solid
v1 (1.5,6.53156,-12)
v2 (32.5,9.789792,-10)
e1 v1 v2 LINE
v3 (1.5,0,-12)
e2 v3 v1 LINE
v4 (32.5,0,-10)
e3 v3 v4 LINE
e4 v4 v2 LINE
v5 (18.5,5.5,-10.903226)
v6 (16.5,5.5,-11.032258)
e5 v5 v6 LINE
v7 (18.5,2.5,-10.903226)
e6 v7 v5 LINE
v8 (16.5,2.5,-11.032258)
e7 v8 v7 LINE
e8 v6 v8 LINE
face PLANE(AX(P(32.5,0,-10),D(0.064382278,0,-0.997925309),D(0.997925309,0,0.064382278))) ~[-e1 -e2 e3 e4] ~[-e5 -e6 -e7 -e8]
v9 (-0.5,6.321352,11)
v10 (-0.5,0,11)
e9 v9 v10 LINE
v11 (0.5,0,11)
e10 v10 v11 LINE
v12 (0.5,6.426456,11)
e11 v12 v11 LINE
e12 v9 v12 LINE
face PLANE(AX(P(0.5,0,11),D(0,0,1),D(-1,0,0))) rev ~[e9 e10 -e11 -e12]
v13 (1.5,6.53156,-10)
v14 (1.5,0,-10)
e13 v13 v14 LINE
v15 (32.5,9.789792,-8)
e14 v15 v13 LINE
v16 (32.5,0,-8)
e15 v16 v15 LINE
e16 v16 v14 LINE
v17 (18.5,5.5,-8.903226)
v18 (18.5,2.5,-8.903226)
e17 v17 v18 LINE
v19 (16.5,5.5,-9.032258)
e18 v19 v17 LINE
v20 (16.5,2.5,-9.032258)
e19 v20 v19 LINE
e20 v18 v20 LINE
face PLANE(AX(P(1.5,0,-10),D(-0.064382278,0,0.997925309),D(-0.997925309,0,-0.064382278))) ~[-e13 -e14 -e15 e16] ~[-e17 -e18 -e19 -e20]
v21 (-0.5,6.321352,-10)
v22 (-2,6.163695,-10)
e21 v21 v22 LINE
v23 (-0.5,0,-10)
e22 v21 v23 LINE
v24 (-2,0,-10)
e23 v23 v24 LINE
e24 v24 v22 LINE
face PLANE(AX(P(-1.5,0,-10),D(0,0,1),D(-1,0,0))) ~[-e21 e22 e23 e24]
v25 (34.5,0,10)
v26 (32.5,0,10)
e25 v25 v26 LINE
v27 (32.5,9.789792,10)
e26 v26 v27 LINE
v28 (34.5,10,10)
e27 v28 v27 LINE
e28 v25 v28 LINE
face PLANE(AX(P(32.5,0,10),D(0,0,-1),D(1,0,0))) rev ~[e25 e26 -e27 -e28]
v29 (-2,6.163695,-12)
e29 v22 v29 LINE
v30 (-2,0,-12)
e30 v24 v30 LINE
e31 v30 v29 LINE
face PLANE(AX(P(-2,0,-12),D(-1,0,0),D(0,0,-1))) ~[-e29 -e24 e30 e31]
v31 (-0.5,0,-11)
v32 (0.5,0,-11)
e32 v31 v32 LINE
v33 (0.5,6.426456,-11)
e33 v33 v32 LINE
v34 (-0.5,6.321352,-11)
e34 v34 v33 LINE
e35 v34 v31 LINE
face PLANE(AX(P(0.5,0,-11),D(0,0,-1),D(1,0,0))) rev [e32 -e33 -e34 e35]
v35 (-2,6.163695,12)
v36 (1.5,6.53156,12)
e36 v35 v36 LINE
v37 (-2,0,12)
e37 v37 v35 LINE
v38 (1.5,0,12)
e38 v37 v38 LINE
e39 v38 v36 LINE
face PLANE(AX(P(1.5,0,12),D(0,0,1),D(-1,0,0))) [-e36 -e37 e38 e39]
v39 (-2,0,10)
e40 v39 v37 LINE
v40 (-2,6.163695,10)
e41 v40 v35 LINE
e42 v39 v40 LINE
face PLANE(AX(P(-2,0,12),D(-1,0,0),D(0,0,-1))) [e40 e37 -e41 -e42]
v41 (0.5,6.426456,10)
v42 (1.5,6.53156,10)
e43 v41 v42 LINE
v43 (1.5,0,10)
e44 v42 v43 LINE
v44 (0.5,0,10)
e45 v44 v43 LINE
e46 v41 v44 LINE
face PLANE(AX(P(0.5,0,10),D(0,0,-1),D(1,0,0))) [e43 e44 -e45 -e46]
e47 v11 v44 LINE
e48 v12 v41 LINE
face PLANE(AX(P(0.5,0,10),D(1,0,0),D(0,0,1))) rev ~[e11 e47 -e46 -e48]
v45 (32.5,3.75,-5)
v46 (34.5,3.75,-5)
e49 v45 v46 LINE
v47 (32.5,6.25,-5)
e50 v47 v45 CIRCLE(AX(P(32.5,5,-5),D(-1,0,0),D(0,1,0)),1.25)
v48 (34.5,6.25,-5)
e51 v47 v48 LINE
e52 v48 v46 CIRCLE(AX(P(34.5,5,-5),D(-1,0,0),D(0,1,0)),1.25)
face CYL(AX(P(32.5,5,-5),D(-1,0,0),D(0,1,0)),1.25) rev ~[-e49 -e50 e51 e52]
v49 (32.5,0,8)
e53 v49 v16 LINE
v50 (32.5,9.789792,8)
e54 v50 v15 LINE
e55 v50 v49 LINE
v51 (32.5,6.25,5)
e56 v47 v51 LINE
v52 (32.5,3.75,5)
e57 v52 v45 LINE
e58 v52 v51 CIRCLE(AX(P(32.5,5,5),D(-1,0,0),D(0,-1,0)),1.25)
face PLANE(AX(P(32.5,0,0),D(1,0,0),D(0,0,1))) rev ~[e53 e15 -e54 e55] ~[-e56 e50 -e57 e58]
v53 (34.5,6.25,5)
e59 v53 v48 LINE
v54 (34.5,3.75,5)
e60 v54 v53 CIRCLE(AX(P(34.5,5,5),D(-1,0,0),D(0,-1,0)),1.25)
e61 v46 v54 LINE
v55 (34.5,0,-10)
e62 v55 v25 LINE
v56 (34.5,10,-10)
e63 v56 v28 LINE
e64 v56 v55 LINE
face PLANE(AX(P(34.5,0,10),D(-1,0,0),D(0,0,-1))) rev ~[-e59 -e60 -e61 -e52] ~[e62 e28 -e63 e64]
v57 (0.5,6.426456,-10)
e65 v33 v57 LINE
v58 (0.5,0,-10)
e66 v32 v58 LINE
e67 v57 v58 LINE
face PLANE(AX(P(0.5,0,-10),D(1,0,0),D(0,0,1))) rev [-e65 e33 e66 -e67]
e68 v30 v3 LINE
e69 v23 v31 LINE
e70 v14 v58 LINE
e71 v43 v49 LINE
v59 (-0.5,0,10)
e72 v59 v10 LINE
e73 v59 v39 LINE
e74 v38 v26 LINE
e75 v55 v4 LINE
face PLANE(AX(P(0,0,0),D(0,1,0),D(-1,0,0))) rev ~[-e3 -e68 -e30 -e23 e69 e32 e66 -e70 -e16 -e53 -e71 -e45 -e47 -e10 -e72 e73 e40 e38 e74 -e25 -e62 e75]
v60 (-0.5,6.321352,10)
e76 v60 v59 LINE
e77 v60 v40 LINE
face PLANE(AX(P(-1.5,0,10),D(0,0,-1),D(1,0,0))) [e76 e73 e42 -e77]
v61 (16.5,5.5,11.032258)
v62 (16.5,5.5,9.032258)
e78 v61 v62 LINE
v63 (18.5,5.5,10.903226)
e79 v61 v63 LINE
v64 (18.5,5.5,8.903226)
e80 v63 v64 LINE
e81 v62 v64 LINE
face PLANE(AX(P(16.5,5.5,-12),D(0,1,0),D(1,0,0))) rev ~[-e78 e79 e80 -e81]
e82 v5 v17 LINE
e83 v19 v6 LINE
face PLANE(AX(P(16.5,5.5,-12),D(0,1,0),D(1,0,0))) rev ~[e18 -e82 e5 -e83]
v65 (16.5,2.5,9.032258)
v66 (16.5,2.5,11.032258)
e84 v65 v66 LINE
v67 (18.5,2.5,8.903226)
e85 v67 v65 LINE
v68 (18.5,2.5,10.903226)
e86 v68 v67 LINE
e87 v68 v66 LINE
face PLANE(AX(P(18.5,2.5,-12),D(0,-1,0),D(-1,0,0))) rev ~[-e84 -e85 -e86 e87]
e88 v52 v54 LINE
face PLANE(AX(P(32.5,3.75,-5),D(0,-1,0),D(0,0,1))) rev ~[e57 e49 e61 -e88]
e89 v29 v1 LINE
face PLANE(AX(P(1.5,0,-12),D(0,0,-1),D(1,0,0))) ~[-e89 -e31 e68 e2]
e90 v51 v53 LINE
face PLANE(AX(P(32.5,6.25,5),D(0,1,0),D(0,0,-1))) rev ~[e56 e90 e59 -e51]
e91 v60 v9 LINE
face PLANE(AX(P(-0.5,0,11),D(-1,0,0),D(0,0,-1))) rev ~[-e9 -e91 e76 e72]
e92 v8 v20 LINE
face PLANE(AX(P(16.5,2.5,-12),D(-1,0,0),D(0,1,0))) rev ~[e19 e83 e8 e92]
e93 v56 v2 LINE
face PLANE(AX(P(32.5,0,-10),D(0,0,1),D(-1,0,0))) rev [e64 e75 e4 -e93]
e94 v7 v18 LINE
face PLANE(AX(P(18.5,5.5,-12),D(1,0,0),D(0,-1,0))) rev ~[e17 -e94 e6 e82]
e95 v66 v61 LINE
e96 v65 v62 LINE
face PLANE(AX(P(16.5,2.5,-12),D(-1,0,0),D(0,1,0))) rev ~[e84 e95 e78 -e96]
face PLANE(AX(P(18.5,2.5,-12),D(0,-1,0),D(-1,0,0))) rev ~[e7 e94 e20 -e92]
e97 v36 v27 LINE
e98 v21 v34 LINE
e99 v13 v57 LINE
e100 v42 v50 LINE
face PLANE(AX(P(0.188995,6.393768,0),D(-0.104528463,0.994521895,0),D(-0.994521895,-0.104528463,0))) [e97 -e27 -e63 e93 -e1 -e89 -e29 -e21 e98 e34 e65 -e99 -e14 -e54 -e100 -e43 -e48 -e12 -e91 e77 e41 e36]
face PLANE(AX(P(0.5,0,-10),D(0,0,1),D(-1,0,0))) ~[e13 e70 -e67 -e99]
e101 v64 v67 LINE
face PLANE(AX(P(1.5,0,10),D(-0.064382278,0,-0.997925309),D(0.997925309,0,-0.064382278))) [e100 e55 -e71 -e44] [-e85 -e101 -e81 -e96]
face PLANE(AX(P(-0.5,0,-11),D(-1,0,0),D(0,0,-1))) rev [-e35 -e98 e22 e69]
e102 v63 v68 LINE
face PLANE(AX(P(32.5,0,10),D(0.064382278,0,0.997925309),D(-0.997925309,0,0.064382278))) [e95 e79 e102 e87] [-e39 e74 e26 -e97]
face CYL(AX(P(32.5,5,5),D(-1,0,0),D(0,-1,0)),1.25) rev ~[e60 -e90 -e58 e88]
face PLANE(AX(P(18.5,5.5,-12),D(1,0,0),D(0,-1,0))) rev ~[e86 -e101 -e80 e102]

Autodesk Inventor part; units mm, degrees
ref_plane "YZ Plane" through (0, 0, 0) normal (1, 0, 0) x (0, 1, 0)
ref_plane "XZ Plane" through (0, 0, 0) normal (0, 1, 0) x (-1, 0, 0)
ref_plane "XY Plane" through (0, 0, 0) normal (0, 0, 1) x (1, 0, 0)
sketch "Sketch1" plane through (0, 0, 0) normal (0, 1, 0) x (-1, 0, 0)
  line L0 (-0.5, 11) -> (0.5, 11) construction
  line L1 (0.5, 11) -> (0.5, -11) construction
  line L2 (0.5, -11) -> (-0.5, -11) construction
  line L3 (-0.5, -11) -> (-0.5, 11) construction
  line L4 (-0.5, 11) -> (0.5, -11) construction
  line L5 (0.5, 11) -> (-0.5, -11) construction
  line L6 (-0.5, 11) -> (-0.5, 9.9373) construction
  line L7 (-1.5, 10) -> (-1.5, 12)
  line L8 (-1.5, 12) -> (1.5, 12)
  line L9 (1.5, 12) -> (1.5, 10)
  line L10 (1.5, 10) -> (-1.5, 12) construction
  line L11 (-1.5, 10) -> (1.5, 12) construction
  line L12 (-0.5, 11) -> (0.5, 11)
  line L13 (0.5, 11) -> (0.5, 10)
  line L14 (-0.5, 10) -> (-0.5, 11)
  line L15 (1.5, 10) -> (0.5, 10)
  line L16 (-0.5, 10) -> (-1.5, 10)
  line L17 (-34.5, 0) -> (-32.5, 0)
  line L18 (-32.5, 0) -> (-32.5, 10)
  line L19 (-32.5, 10) -> (-34.5, 10)
  line L20 (-34.5, 10) -> (-34.5, 0)
  line L21 (-32.5, 10) -> (-1.5, 12)
  line L22 (-1.5, 10) -> (-32.5, 8)
  point P0 (0, 0)
  point P1 (0, 11)
  dimension "d0" = 1
  dimension "d1" = 22
  dimension "d2" = 3
  dimension "d3" = 2
  dimension "d4" = 2
  dimension "d5" = 10
  dimension "d6" = 35
extrude "Extrusion1" add sketch "Sketch1" along normal blind 10
mirror "Mirror1" about plane through (34.5, 0, 0) normal (0, 0, -1) of "Extrusion1"
draft "FaceDraft1" angle 6 pull direction (-1, 0, 0) faces at (11.8333, 10, -10.6667) fixed edges at (34.5, 10, 0)
sketch "Sketch2" plane through (1.5, 0, -12) normal (0, 0, -1) x (-1, 0, 0)
  line L0 (-15, 5.5) -> (-17, 5.5)
  line L1 (-17, 5.5) -> (-17, 2.5)
  line L2 (-17, 2.5) -> (-15, 2.5)
  line L3 (-15, 2.5) -> (-15, 5.5)
  line L4 (-15, 5.5) -> (-17, 2.5) construction
  line L5 (-17, 5.5) -> (-15, 2.5) construction
  line L6 (0, 0) -> (-31, 0) projected
  line L7 (3, 0) -> (3, 6.2162) projected
  point P0 (1.5, 0)
  point P1 (-16, 4)
  dimension "d10" = 2
  dimension "d11" = 3
  dimension "d12" = 2.5
  dimension "d13" = 18
extrude "Extrusion2" cut sketch "Sketch2" against normal through all
sketch "Sketch3" plane through (32.5, 0, -8) normal (-1, 0, 0) x (0, 0, 1)
  line L0 (13, 5) -> (3, 5) construction
  line L1 (13, 6.25) -> (3, 6.25)
  line L2 (3, 3.75) -> (13, 3.75)
  arc A0 (13, 3.75) -> (13, 6.25) centre (13, 5) ccw
  arc A1 (3, 6.25) -> (3, 3.75) centre (3, 5) ccw
  point P0 (8, 0)
  point P1 (8, 5)
  dimension "d16" = 5
  dimension "d17" = 2.5
extrude "Extrusion3" cut sketch "Sketch3" against normal through all
move faces "Move1" translate (-0.5, 0, 0) faces at (-1.5, 4.1442, -11.3333) (-1.5, 4.1442, 11.3333)
properties part number "holder"
